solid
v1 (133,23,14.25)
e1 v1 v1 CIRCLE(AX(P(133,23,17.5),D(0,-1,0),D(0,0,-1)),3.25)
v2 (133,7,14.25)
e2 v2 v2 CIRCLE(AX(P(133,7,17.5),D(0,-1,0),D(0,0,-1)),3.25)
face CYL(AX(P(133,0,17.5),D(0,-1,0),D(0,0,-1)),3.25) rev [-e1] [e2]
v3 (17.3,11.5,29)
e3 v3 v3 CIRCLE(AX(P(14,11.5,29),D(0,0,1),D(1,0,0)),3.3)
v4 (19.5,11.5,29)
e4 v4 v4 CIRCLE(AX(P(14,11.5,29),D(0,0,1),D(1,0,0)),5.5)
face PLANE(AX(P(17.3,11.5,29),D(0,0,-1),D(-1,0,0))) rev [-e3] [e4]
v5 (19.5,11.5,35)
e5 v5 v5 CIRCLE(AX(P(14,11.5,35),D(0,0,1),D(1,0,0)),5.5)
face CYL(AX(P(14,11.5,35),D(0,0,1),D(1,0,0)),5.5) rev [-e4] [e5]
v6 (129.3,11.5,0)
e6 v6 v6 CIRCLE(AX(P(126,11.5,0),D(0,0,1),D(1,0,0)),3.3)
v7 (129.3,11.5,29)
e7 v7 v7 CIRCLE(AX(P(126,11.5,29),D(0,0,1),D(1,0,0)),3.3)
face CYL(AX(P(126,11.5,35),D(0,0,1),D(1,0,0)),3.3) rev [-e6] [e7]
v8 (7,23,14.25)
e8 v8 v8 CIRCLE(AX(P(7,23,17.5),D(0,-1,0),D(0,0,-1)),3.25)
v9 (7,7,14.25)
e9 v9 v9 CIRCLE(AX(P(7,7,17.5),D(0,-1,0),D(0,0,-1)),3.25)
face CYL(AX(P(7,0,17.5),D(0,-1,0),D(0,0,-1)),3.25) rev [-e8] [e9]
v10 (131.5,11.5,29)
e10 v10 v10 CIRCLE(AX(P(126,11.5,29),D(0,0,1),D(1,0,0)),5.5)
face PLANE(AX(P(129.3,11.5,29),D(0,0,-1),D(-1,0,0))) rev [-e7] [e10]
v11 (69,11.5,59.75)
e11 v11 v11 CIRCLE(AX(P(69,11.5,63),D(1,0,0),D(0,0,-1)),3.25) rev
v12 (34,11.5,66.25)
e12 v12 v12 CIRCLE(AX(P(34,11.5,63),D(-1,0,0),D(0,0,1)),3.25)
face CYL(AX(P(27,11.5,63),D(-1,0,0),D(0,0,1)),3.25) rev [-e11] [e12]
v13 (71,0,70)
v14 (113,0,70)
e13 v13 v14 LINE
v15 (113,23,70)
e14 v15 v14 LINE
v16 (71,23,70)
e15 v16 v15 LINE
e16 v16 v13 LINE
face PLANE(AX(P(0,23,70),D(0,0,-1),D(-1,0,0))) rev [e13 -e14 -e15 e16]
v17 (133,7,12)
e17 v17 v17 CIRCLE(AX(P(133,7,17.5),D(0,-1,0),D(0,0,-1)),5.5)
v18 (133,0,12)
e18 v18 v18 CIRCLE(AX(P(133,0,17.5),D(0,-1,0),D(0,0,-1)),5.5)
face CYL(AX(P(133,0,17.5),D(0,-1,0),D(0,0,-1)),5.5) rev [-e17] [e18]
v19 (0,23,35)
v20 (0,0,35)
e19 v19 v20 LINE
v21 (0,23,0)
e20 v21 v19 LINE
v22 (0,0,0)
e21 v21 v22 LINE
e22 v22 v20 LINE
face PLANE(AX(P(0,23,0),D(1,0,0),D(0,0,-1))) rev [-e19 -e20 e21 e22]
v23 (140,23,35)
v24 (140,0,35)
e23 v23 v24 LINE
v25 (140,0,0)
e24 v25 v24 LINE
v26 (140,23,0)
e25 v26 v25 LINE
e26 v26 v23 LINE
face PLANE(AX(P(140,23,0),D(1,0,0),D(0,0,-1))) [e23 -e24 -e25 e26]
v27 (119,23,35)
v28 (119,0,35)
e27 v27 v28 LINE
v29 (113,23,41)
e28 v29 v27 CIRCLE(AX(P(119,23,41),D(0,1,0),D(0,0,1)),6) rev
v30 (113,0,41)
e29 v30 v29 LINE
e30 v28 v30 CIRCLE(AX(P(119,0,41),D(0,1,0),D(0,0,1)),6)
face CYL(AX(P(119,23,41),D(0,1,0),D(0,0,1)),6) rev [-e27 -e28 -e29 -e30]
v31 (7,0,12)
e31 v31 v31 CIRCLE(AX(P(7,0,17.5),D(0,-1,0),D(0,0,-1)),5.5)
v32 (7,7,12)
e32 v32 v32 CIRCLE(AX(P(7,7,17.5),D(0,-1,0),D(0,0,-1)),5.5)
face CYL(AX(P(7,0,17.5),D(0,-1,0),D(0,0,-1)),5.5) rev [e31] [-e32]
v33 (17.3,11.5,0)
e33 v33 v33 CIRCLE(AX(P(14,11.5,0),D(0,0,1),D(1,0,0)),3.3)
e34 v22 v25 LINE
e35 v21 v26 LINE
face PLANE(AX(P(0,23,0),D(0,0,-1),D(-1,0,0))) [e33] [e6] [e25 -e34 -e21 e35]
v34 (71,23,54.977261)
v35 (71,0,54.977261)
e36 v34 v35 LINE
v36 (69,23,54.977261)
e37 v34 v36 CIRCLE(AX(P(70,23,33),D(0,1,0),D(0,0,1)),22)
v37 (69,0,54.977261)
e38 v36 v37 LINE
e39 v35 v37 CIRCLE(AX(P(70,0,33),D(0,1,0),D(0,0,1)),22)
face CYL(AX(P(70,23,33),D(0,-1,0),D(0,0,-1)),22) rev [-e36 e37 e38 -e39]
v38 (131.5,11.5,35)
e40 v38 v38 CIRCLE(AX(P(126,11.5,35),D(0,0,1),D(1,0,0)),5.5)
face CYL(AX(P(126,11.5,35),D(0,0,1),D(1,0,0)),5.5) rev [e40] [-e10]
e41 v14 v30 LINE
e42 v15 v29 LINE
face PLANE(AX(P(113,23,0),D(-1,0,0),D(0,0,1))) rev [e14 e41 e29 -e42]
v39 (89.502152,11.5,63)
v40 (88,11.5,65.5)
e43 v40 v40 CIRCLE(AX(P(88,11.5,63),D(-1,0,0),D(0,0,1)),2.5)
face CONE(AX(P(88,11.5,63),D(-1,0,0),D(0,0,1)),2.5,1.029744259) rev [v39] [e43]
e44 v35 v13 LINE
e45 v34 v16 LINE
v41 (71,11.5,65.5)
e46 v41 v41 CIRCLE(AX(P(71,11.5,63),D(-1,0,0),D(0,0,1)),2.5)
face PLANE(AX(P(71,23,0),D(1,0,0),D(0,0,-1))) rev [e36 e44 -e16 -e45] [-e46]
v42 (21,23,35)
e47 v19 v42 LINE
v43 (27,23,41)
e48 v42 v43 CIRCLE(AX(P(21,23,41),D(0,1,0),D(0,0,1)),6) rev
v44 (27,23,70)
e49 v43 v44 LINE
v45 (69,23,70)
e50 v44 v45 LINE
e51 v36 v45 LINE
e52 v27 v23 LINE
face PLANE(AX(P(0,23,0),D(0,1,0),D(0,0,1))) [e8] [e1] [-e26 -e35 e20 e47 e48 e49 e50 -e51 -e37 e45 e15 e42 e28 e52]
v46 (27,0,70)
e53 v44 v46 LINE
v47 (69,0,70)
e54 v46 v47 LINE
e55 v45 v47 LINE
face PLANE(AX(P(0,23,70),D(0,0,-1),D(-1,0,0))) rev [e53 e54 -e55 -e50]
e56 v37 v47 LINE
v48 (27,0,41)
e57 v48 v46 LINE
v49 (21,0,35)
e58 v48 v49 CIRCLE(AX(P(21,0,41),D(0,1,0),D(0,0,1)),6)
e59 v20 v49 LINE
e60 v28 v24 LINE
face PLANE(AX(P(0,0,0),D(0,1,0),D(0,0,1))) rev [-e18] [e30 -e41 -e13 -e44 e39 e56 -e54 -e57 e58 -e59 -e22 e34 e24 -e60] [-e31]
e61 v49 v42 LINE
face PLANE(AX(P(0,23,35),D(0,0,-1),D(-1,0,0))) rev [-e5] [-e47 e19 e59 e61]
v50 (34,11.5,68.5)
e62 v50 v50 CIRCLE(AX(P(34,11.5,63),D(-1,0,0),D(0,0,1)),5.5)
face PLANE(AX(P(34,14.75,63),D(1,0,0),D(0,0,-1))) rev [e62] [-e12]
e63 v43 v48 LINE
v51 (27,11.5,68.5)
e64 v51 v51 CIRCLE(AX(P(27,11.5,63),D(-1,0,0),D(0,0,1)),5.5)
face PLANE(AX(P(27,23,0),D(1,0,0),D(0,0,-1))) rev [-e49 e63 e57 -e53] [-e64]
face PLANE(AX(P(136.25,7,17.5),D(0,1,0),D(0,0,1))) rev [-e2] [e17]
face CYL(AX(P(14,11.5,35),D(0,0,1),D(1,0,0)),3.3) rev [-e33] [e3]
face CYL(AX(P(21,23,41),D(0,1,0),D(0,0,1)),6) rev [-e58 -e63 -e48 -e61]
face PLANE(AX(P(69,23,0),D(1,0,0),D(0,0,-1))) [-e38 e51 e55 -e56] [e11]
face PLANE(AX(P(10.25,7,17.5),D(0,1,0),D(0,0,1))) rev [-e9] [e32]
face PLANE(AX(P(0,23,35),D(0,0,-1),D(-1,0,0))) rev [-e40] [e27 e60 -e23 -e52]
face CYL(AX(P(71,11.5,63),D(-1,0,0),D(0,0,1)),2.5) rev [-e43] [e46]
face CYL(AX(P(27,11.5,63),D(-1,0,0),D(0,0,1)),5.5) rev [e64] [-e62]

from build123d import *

# Parameters (mm, degrees)
DODANIE_WYCI_GNI_CIE1_DEPTH                        = 23
ZAOKR_GLENIE1_R                                    = 6
POG_BIENIE_START                                   = 27
POG_BIENIE_WALCOWE_POD_M6_WKR_T_DO_C_2_R           = 3.25
POG_BIENIE_WALCOWE_POD_M6_WKR_T_DO_CZ_CI_DEPTH     = 42
POG_BIENIE_WALCOWE_POD_M6_WKR_T_DO_C_3_O_R         = 5.5
POG_BIENIE_WALCOWE_POD_M6_WKR_T_DO_C_3_O_R_2       = 3.25
POG_BIENIE_WALCOWE_POD_M6_WKR_T_DO_C_3_DEPTH       = 7
OTW_R_GWINTOWANY_M6X1_01_D                         = 5
OTW_R_GWINTOWANY_M6X1_01_DEPTH                     = 17
OTW_R_GWINTOWANY_M6X1_01_TIP                       = 1.502151548
POG_BIENIE_WALCOWE_POD_M6_WKR_T_DO_C_4_D           = 6.6
POG_BIENIE_WALCOWE_POD_M6_WKR_T_DO_C_4_CBORE_D     = 11
POG_BIENIE_WALCOWE_POD_M6_WKR_T_DO_C_4_CBORE_DEPTH = 6
POG_BIENIE_WALCOWE_POD_M6_WKR_T_DO_C_5_D           = 6.5
POG_BIENIE_WALCOWE_POD_M6_WKR_T_DO_C_5_CBORE_D     = 11
POG_BIENIE_WALCOWE_POD_M6_WKR_T_DO_C_5_CBORE_DEPTH = 7


# Read off the part's stored shape, not the designer's step: Pogłębienie walcowe pod M6 Wkręt do części metalowych z łbem sześciokątnym1
with BuildPart() as part:
    # Szkic1 → Dodanie-wyciągnięcie1 (new body)
    with BuildSketch(Plane(origin=(0, 0, 0), x_dir=(1, 0, 0), z_dir=(0, 1, 0))):
        with BuildLine():
            Line((0, 0), (0, -35))
            Line((0, -35), (27, -35))
            Line((27, -35), (27, -70))
            Line((27, -70), (69, -70))
            Line((69, -70), (69, -54.977260976))
            ThreePointArc((69, -54.977260976), (48.005685491, -32.499870751), (70, -11))
            Line((70, -11), (70, 0))
            Line((70, 0), (0, 0))
        make_face()
        with BuildLine():
            Line((140, 0), (70, 0))
            Line((70, 0), (70, -11))
            ThreePointArc((70, -11), (91.994314509, -32.499870751), (71, -54.977260976))
            Line((71, -54.977260976), (71, -70))
            Line((71, -70), (113, -70))
            Line((113, -70), (113, -35))
            Line((113, -35), (140, -35))
            Line((140, -35), (140, 0))
        make_face()
    extrude(amount=DODANIE_WYCI_GNI_CIE1_DEPTH)

    # Zaokrąglenie1
    zaokr_glenie1_edges = [part.edges().sort_by_distance(p)[0] for p in [
        (27, 11.5, 35),
        (113, 11.5, 35),
    ]]
    fillet(zaokr_glenie1_edges, radius=ZAOKR_GLENIE1_R)

    # Pog_bienie walcowe pod M6 Wkr_t do c 2 → Pog_bienie walcowe pod M6 Wkr_t do cz_ci (cut)
    with BuildSketch(Plane.YZ.offset(POG_BIENIE_START)):
        with Locations((11.5, 63)):
            Circle(POG_BIENIE_WALCOWE_POD_M6_WKR_T_DO_C_2_R)
    extrude(amount=POG_BIENIE_WALCOWE_POD_M6_WKR_T_DO_CZ_CI_DEPTH, mode=Mode.SUBTRACT)

    # Pog_bienie walcowe pod M6 Wkr_t do c 3 o → Pog_bienie walcowe pod M6 Wkr_t do c 3 (cut)
    with BuildSketch(Plane.YZ.offset(POG_BIENIE_START)):
        with Locations((11.5, 63)):
            Circle(POG_BIENIE_WALCOWE_POD_M6_WKR_T_DO_C_3_O_R)
        with Locations((11.5, 63)):
            Circle(POG_BIENIE_WALCOWE_POD_M6_WKR_T_DO_C_3_O_R_2, mode=Mode.SUBTRACT)
    extrude(amount=POG_BIENIE_WALCOWE_POD_M6_WKR_T_DO_C_3_DEPTH, mode=Mode.SUBTRACT)

    # Otwór gwintowany M6x1.01
    with Locations(Plane.ZY.offset(-71)):
        with Locations((63, 11.5)):
            Hole(OTW_R_GWINTOWANY_M6X1_01_D / 2, depth=OTW_R_GWINTOWANY_M6X1_01_DEPTH)
            with Locations((0, 0, -(OTW_R_GWINTOWANY_M6X1_01_DEPTH + OTW_R_GWINTOWANY_M6X1_01_TIP / 2))):  # 118° drill point
                Cone(0, OTW_R_GWINTOWANY_M6X1_01_D / 2, OTW_R_GWINTOWANY_M6X1_01_TIP, mode=Mode.SUBTRACT)

    # Pog_bienie walcowe pod M6 Wkr_t do c 4 (through all)
    with Locations(Plane.XY.offset(35)):
        with Locations((14, 11.5), (126, 11.5)):
            CounterBoreHole(POG_BIENIE_WALCOWE_POD_M6_WKR_T_DO_C_4_D / 2, POG_BIENIE_WALCOWE_POD_M6_WKR_T_DO_C_4_CBORE_D / 2, POG_BIENIE_WALCOWE_POD_M6_WKR_T_DO_C_4_CBORE_DEPTH)

    # Pog_bienie walcowe pod M6 Wkr_t do c 5 (through all)
    with Locations(Plane(origin=(0, 0, 0), x_dir=(-1, 0, 0), z_dir=(0, -1, 0))):
        with Locations((-7, -17.5), (-133, -17.5)):
            CounterBoreHole(POG_BIENIE_WALCOWE_POD_M6_WKR_T_DO_C_5_D / 2, POG_BIENIE_WALCOWE_POD_M6_WKR_T_DO_C_5_CBORE_D / 2, POG_BIENIE_WALCOWE_POD_M6_WKR_T_DO_C_5_CBORE_DEPTH)


solid = part.part
